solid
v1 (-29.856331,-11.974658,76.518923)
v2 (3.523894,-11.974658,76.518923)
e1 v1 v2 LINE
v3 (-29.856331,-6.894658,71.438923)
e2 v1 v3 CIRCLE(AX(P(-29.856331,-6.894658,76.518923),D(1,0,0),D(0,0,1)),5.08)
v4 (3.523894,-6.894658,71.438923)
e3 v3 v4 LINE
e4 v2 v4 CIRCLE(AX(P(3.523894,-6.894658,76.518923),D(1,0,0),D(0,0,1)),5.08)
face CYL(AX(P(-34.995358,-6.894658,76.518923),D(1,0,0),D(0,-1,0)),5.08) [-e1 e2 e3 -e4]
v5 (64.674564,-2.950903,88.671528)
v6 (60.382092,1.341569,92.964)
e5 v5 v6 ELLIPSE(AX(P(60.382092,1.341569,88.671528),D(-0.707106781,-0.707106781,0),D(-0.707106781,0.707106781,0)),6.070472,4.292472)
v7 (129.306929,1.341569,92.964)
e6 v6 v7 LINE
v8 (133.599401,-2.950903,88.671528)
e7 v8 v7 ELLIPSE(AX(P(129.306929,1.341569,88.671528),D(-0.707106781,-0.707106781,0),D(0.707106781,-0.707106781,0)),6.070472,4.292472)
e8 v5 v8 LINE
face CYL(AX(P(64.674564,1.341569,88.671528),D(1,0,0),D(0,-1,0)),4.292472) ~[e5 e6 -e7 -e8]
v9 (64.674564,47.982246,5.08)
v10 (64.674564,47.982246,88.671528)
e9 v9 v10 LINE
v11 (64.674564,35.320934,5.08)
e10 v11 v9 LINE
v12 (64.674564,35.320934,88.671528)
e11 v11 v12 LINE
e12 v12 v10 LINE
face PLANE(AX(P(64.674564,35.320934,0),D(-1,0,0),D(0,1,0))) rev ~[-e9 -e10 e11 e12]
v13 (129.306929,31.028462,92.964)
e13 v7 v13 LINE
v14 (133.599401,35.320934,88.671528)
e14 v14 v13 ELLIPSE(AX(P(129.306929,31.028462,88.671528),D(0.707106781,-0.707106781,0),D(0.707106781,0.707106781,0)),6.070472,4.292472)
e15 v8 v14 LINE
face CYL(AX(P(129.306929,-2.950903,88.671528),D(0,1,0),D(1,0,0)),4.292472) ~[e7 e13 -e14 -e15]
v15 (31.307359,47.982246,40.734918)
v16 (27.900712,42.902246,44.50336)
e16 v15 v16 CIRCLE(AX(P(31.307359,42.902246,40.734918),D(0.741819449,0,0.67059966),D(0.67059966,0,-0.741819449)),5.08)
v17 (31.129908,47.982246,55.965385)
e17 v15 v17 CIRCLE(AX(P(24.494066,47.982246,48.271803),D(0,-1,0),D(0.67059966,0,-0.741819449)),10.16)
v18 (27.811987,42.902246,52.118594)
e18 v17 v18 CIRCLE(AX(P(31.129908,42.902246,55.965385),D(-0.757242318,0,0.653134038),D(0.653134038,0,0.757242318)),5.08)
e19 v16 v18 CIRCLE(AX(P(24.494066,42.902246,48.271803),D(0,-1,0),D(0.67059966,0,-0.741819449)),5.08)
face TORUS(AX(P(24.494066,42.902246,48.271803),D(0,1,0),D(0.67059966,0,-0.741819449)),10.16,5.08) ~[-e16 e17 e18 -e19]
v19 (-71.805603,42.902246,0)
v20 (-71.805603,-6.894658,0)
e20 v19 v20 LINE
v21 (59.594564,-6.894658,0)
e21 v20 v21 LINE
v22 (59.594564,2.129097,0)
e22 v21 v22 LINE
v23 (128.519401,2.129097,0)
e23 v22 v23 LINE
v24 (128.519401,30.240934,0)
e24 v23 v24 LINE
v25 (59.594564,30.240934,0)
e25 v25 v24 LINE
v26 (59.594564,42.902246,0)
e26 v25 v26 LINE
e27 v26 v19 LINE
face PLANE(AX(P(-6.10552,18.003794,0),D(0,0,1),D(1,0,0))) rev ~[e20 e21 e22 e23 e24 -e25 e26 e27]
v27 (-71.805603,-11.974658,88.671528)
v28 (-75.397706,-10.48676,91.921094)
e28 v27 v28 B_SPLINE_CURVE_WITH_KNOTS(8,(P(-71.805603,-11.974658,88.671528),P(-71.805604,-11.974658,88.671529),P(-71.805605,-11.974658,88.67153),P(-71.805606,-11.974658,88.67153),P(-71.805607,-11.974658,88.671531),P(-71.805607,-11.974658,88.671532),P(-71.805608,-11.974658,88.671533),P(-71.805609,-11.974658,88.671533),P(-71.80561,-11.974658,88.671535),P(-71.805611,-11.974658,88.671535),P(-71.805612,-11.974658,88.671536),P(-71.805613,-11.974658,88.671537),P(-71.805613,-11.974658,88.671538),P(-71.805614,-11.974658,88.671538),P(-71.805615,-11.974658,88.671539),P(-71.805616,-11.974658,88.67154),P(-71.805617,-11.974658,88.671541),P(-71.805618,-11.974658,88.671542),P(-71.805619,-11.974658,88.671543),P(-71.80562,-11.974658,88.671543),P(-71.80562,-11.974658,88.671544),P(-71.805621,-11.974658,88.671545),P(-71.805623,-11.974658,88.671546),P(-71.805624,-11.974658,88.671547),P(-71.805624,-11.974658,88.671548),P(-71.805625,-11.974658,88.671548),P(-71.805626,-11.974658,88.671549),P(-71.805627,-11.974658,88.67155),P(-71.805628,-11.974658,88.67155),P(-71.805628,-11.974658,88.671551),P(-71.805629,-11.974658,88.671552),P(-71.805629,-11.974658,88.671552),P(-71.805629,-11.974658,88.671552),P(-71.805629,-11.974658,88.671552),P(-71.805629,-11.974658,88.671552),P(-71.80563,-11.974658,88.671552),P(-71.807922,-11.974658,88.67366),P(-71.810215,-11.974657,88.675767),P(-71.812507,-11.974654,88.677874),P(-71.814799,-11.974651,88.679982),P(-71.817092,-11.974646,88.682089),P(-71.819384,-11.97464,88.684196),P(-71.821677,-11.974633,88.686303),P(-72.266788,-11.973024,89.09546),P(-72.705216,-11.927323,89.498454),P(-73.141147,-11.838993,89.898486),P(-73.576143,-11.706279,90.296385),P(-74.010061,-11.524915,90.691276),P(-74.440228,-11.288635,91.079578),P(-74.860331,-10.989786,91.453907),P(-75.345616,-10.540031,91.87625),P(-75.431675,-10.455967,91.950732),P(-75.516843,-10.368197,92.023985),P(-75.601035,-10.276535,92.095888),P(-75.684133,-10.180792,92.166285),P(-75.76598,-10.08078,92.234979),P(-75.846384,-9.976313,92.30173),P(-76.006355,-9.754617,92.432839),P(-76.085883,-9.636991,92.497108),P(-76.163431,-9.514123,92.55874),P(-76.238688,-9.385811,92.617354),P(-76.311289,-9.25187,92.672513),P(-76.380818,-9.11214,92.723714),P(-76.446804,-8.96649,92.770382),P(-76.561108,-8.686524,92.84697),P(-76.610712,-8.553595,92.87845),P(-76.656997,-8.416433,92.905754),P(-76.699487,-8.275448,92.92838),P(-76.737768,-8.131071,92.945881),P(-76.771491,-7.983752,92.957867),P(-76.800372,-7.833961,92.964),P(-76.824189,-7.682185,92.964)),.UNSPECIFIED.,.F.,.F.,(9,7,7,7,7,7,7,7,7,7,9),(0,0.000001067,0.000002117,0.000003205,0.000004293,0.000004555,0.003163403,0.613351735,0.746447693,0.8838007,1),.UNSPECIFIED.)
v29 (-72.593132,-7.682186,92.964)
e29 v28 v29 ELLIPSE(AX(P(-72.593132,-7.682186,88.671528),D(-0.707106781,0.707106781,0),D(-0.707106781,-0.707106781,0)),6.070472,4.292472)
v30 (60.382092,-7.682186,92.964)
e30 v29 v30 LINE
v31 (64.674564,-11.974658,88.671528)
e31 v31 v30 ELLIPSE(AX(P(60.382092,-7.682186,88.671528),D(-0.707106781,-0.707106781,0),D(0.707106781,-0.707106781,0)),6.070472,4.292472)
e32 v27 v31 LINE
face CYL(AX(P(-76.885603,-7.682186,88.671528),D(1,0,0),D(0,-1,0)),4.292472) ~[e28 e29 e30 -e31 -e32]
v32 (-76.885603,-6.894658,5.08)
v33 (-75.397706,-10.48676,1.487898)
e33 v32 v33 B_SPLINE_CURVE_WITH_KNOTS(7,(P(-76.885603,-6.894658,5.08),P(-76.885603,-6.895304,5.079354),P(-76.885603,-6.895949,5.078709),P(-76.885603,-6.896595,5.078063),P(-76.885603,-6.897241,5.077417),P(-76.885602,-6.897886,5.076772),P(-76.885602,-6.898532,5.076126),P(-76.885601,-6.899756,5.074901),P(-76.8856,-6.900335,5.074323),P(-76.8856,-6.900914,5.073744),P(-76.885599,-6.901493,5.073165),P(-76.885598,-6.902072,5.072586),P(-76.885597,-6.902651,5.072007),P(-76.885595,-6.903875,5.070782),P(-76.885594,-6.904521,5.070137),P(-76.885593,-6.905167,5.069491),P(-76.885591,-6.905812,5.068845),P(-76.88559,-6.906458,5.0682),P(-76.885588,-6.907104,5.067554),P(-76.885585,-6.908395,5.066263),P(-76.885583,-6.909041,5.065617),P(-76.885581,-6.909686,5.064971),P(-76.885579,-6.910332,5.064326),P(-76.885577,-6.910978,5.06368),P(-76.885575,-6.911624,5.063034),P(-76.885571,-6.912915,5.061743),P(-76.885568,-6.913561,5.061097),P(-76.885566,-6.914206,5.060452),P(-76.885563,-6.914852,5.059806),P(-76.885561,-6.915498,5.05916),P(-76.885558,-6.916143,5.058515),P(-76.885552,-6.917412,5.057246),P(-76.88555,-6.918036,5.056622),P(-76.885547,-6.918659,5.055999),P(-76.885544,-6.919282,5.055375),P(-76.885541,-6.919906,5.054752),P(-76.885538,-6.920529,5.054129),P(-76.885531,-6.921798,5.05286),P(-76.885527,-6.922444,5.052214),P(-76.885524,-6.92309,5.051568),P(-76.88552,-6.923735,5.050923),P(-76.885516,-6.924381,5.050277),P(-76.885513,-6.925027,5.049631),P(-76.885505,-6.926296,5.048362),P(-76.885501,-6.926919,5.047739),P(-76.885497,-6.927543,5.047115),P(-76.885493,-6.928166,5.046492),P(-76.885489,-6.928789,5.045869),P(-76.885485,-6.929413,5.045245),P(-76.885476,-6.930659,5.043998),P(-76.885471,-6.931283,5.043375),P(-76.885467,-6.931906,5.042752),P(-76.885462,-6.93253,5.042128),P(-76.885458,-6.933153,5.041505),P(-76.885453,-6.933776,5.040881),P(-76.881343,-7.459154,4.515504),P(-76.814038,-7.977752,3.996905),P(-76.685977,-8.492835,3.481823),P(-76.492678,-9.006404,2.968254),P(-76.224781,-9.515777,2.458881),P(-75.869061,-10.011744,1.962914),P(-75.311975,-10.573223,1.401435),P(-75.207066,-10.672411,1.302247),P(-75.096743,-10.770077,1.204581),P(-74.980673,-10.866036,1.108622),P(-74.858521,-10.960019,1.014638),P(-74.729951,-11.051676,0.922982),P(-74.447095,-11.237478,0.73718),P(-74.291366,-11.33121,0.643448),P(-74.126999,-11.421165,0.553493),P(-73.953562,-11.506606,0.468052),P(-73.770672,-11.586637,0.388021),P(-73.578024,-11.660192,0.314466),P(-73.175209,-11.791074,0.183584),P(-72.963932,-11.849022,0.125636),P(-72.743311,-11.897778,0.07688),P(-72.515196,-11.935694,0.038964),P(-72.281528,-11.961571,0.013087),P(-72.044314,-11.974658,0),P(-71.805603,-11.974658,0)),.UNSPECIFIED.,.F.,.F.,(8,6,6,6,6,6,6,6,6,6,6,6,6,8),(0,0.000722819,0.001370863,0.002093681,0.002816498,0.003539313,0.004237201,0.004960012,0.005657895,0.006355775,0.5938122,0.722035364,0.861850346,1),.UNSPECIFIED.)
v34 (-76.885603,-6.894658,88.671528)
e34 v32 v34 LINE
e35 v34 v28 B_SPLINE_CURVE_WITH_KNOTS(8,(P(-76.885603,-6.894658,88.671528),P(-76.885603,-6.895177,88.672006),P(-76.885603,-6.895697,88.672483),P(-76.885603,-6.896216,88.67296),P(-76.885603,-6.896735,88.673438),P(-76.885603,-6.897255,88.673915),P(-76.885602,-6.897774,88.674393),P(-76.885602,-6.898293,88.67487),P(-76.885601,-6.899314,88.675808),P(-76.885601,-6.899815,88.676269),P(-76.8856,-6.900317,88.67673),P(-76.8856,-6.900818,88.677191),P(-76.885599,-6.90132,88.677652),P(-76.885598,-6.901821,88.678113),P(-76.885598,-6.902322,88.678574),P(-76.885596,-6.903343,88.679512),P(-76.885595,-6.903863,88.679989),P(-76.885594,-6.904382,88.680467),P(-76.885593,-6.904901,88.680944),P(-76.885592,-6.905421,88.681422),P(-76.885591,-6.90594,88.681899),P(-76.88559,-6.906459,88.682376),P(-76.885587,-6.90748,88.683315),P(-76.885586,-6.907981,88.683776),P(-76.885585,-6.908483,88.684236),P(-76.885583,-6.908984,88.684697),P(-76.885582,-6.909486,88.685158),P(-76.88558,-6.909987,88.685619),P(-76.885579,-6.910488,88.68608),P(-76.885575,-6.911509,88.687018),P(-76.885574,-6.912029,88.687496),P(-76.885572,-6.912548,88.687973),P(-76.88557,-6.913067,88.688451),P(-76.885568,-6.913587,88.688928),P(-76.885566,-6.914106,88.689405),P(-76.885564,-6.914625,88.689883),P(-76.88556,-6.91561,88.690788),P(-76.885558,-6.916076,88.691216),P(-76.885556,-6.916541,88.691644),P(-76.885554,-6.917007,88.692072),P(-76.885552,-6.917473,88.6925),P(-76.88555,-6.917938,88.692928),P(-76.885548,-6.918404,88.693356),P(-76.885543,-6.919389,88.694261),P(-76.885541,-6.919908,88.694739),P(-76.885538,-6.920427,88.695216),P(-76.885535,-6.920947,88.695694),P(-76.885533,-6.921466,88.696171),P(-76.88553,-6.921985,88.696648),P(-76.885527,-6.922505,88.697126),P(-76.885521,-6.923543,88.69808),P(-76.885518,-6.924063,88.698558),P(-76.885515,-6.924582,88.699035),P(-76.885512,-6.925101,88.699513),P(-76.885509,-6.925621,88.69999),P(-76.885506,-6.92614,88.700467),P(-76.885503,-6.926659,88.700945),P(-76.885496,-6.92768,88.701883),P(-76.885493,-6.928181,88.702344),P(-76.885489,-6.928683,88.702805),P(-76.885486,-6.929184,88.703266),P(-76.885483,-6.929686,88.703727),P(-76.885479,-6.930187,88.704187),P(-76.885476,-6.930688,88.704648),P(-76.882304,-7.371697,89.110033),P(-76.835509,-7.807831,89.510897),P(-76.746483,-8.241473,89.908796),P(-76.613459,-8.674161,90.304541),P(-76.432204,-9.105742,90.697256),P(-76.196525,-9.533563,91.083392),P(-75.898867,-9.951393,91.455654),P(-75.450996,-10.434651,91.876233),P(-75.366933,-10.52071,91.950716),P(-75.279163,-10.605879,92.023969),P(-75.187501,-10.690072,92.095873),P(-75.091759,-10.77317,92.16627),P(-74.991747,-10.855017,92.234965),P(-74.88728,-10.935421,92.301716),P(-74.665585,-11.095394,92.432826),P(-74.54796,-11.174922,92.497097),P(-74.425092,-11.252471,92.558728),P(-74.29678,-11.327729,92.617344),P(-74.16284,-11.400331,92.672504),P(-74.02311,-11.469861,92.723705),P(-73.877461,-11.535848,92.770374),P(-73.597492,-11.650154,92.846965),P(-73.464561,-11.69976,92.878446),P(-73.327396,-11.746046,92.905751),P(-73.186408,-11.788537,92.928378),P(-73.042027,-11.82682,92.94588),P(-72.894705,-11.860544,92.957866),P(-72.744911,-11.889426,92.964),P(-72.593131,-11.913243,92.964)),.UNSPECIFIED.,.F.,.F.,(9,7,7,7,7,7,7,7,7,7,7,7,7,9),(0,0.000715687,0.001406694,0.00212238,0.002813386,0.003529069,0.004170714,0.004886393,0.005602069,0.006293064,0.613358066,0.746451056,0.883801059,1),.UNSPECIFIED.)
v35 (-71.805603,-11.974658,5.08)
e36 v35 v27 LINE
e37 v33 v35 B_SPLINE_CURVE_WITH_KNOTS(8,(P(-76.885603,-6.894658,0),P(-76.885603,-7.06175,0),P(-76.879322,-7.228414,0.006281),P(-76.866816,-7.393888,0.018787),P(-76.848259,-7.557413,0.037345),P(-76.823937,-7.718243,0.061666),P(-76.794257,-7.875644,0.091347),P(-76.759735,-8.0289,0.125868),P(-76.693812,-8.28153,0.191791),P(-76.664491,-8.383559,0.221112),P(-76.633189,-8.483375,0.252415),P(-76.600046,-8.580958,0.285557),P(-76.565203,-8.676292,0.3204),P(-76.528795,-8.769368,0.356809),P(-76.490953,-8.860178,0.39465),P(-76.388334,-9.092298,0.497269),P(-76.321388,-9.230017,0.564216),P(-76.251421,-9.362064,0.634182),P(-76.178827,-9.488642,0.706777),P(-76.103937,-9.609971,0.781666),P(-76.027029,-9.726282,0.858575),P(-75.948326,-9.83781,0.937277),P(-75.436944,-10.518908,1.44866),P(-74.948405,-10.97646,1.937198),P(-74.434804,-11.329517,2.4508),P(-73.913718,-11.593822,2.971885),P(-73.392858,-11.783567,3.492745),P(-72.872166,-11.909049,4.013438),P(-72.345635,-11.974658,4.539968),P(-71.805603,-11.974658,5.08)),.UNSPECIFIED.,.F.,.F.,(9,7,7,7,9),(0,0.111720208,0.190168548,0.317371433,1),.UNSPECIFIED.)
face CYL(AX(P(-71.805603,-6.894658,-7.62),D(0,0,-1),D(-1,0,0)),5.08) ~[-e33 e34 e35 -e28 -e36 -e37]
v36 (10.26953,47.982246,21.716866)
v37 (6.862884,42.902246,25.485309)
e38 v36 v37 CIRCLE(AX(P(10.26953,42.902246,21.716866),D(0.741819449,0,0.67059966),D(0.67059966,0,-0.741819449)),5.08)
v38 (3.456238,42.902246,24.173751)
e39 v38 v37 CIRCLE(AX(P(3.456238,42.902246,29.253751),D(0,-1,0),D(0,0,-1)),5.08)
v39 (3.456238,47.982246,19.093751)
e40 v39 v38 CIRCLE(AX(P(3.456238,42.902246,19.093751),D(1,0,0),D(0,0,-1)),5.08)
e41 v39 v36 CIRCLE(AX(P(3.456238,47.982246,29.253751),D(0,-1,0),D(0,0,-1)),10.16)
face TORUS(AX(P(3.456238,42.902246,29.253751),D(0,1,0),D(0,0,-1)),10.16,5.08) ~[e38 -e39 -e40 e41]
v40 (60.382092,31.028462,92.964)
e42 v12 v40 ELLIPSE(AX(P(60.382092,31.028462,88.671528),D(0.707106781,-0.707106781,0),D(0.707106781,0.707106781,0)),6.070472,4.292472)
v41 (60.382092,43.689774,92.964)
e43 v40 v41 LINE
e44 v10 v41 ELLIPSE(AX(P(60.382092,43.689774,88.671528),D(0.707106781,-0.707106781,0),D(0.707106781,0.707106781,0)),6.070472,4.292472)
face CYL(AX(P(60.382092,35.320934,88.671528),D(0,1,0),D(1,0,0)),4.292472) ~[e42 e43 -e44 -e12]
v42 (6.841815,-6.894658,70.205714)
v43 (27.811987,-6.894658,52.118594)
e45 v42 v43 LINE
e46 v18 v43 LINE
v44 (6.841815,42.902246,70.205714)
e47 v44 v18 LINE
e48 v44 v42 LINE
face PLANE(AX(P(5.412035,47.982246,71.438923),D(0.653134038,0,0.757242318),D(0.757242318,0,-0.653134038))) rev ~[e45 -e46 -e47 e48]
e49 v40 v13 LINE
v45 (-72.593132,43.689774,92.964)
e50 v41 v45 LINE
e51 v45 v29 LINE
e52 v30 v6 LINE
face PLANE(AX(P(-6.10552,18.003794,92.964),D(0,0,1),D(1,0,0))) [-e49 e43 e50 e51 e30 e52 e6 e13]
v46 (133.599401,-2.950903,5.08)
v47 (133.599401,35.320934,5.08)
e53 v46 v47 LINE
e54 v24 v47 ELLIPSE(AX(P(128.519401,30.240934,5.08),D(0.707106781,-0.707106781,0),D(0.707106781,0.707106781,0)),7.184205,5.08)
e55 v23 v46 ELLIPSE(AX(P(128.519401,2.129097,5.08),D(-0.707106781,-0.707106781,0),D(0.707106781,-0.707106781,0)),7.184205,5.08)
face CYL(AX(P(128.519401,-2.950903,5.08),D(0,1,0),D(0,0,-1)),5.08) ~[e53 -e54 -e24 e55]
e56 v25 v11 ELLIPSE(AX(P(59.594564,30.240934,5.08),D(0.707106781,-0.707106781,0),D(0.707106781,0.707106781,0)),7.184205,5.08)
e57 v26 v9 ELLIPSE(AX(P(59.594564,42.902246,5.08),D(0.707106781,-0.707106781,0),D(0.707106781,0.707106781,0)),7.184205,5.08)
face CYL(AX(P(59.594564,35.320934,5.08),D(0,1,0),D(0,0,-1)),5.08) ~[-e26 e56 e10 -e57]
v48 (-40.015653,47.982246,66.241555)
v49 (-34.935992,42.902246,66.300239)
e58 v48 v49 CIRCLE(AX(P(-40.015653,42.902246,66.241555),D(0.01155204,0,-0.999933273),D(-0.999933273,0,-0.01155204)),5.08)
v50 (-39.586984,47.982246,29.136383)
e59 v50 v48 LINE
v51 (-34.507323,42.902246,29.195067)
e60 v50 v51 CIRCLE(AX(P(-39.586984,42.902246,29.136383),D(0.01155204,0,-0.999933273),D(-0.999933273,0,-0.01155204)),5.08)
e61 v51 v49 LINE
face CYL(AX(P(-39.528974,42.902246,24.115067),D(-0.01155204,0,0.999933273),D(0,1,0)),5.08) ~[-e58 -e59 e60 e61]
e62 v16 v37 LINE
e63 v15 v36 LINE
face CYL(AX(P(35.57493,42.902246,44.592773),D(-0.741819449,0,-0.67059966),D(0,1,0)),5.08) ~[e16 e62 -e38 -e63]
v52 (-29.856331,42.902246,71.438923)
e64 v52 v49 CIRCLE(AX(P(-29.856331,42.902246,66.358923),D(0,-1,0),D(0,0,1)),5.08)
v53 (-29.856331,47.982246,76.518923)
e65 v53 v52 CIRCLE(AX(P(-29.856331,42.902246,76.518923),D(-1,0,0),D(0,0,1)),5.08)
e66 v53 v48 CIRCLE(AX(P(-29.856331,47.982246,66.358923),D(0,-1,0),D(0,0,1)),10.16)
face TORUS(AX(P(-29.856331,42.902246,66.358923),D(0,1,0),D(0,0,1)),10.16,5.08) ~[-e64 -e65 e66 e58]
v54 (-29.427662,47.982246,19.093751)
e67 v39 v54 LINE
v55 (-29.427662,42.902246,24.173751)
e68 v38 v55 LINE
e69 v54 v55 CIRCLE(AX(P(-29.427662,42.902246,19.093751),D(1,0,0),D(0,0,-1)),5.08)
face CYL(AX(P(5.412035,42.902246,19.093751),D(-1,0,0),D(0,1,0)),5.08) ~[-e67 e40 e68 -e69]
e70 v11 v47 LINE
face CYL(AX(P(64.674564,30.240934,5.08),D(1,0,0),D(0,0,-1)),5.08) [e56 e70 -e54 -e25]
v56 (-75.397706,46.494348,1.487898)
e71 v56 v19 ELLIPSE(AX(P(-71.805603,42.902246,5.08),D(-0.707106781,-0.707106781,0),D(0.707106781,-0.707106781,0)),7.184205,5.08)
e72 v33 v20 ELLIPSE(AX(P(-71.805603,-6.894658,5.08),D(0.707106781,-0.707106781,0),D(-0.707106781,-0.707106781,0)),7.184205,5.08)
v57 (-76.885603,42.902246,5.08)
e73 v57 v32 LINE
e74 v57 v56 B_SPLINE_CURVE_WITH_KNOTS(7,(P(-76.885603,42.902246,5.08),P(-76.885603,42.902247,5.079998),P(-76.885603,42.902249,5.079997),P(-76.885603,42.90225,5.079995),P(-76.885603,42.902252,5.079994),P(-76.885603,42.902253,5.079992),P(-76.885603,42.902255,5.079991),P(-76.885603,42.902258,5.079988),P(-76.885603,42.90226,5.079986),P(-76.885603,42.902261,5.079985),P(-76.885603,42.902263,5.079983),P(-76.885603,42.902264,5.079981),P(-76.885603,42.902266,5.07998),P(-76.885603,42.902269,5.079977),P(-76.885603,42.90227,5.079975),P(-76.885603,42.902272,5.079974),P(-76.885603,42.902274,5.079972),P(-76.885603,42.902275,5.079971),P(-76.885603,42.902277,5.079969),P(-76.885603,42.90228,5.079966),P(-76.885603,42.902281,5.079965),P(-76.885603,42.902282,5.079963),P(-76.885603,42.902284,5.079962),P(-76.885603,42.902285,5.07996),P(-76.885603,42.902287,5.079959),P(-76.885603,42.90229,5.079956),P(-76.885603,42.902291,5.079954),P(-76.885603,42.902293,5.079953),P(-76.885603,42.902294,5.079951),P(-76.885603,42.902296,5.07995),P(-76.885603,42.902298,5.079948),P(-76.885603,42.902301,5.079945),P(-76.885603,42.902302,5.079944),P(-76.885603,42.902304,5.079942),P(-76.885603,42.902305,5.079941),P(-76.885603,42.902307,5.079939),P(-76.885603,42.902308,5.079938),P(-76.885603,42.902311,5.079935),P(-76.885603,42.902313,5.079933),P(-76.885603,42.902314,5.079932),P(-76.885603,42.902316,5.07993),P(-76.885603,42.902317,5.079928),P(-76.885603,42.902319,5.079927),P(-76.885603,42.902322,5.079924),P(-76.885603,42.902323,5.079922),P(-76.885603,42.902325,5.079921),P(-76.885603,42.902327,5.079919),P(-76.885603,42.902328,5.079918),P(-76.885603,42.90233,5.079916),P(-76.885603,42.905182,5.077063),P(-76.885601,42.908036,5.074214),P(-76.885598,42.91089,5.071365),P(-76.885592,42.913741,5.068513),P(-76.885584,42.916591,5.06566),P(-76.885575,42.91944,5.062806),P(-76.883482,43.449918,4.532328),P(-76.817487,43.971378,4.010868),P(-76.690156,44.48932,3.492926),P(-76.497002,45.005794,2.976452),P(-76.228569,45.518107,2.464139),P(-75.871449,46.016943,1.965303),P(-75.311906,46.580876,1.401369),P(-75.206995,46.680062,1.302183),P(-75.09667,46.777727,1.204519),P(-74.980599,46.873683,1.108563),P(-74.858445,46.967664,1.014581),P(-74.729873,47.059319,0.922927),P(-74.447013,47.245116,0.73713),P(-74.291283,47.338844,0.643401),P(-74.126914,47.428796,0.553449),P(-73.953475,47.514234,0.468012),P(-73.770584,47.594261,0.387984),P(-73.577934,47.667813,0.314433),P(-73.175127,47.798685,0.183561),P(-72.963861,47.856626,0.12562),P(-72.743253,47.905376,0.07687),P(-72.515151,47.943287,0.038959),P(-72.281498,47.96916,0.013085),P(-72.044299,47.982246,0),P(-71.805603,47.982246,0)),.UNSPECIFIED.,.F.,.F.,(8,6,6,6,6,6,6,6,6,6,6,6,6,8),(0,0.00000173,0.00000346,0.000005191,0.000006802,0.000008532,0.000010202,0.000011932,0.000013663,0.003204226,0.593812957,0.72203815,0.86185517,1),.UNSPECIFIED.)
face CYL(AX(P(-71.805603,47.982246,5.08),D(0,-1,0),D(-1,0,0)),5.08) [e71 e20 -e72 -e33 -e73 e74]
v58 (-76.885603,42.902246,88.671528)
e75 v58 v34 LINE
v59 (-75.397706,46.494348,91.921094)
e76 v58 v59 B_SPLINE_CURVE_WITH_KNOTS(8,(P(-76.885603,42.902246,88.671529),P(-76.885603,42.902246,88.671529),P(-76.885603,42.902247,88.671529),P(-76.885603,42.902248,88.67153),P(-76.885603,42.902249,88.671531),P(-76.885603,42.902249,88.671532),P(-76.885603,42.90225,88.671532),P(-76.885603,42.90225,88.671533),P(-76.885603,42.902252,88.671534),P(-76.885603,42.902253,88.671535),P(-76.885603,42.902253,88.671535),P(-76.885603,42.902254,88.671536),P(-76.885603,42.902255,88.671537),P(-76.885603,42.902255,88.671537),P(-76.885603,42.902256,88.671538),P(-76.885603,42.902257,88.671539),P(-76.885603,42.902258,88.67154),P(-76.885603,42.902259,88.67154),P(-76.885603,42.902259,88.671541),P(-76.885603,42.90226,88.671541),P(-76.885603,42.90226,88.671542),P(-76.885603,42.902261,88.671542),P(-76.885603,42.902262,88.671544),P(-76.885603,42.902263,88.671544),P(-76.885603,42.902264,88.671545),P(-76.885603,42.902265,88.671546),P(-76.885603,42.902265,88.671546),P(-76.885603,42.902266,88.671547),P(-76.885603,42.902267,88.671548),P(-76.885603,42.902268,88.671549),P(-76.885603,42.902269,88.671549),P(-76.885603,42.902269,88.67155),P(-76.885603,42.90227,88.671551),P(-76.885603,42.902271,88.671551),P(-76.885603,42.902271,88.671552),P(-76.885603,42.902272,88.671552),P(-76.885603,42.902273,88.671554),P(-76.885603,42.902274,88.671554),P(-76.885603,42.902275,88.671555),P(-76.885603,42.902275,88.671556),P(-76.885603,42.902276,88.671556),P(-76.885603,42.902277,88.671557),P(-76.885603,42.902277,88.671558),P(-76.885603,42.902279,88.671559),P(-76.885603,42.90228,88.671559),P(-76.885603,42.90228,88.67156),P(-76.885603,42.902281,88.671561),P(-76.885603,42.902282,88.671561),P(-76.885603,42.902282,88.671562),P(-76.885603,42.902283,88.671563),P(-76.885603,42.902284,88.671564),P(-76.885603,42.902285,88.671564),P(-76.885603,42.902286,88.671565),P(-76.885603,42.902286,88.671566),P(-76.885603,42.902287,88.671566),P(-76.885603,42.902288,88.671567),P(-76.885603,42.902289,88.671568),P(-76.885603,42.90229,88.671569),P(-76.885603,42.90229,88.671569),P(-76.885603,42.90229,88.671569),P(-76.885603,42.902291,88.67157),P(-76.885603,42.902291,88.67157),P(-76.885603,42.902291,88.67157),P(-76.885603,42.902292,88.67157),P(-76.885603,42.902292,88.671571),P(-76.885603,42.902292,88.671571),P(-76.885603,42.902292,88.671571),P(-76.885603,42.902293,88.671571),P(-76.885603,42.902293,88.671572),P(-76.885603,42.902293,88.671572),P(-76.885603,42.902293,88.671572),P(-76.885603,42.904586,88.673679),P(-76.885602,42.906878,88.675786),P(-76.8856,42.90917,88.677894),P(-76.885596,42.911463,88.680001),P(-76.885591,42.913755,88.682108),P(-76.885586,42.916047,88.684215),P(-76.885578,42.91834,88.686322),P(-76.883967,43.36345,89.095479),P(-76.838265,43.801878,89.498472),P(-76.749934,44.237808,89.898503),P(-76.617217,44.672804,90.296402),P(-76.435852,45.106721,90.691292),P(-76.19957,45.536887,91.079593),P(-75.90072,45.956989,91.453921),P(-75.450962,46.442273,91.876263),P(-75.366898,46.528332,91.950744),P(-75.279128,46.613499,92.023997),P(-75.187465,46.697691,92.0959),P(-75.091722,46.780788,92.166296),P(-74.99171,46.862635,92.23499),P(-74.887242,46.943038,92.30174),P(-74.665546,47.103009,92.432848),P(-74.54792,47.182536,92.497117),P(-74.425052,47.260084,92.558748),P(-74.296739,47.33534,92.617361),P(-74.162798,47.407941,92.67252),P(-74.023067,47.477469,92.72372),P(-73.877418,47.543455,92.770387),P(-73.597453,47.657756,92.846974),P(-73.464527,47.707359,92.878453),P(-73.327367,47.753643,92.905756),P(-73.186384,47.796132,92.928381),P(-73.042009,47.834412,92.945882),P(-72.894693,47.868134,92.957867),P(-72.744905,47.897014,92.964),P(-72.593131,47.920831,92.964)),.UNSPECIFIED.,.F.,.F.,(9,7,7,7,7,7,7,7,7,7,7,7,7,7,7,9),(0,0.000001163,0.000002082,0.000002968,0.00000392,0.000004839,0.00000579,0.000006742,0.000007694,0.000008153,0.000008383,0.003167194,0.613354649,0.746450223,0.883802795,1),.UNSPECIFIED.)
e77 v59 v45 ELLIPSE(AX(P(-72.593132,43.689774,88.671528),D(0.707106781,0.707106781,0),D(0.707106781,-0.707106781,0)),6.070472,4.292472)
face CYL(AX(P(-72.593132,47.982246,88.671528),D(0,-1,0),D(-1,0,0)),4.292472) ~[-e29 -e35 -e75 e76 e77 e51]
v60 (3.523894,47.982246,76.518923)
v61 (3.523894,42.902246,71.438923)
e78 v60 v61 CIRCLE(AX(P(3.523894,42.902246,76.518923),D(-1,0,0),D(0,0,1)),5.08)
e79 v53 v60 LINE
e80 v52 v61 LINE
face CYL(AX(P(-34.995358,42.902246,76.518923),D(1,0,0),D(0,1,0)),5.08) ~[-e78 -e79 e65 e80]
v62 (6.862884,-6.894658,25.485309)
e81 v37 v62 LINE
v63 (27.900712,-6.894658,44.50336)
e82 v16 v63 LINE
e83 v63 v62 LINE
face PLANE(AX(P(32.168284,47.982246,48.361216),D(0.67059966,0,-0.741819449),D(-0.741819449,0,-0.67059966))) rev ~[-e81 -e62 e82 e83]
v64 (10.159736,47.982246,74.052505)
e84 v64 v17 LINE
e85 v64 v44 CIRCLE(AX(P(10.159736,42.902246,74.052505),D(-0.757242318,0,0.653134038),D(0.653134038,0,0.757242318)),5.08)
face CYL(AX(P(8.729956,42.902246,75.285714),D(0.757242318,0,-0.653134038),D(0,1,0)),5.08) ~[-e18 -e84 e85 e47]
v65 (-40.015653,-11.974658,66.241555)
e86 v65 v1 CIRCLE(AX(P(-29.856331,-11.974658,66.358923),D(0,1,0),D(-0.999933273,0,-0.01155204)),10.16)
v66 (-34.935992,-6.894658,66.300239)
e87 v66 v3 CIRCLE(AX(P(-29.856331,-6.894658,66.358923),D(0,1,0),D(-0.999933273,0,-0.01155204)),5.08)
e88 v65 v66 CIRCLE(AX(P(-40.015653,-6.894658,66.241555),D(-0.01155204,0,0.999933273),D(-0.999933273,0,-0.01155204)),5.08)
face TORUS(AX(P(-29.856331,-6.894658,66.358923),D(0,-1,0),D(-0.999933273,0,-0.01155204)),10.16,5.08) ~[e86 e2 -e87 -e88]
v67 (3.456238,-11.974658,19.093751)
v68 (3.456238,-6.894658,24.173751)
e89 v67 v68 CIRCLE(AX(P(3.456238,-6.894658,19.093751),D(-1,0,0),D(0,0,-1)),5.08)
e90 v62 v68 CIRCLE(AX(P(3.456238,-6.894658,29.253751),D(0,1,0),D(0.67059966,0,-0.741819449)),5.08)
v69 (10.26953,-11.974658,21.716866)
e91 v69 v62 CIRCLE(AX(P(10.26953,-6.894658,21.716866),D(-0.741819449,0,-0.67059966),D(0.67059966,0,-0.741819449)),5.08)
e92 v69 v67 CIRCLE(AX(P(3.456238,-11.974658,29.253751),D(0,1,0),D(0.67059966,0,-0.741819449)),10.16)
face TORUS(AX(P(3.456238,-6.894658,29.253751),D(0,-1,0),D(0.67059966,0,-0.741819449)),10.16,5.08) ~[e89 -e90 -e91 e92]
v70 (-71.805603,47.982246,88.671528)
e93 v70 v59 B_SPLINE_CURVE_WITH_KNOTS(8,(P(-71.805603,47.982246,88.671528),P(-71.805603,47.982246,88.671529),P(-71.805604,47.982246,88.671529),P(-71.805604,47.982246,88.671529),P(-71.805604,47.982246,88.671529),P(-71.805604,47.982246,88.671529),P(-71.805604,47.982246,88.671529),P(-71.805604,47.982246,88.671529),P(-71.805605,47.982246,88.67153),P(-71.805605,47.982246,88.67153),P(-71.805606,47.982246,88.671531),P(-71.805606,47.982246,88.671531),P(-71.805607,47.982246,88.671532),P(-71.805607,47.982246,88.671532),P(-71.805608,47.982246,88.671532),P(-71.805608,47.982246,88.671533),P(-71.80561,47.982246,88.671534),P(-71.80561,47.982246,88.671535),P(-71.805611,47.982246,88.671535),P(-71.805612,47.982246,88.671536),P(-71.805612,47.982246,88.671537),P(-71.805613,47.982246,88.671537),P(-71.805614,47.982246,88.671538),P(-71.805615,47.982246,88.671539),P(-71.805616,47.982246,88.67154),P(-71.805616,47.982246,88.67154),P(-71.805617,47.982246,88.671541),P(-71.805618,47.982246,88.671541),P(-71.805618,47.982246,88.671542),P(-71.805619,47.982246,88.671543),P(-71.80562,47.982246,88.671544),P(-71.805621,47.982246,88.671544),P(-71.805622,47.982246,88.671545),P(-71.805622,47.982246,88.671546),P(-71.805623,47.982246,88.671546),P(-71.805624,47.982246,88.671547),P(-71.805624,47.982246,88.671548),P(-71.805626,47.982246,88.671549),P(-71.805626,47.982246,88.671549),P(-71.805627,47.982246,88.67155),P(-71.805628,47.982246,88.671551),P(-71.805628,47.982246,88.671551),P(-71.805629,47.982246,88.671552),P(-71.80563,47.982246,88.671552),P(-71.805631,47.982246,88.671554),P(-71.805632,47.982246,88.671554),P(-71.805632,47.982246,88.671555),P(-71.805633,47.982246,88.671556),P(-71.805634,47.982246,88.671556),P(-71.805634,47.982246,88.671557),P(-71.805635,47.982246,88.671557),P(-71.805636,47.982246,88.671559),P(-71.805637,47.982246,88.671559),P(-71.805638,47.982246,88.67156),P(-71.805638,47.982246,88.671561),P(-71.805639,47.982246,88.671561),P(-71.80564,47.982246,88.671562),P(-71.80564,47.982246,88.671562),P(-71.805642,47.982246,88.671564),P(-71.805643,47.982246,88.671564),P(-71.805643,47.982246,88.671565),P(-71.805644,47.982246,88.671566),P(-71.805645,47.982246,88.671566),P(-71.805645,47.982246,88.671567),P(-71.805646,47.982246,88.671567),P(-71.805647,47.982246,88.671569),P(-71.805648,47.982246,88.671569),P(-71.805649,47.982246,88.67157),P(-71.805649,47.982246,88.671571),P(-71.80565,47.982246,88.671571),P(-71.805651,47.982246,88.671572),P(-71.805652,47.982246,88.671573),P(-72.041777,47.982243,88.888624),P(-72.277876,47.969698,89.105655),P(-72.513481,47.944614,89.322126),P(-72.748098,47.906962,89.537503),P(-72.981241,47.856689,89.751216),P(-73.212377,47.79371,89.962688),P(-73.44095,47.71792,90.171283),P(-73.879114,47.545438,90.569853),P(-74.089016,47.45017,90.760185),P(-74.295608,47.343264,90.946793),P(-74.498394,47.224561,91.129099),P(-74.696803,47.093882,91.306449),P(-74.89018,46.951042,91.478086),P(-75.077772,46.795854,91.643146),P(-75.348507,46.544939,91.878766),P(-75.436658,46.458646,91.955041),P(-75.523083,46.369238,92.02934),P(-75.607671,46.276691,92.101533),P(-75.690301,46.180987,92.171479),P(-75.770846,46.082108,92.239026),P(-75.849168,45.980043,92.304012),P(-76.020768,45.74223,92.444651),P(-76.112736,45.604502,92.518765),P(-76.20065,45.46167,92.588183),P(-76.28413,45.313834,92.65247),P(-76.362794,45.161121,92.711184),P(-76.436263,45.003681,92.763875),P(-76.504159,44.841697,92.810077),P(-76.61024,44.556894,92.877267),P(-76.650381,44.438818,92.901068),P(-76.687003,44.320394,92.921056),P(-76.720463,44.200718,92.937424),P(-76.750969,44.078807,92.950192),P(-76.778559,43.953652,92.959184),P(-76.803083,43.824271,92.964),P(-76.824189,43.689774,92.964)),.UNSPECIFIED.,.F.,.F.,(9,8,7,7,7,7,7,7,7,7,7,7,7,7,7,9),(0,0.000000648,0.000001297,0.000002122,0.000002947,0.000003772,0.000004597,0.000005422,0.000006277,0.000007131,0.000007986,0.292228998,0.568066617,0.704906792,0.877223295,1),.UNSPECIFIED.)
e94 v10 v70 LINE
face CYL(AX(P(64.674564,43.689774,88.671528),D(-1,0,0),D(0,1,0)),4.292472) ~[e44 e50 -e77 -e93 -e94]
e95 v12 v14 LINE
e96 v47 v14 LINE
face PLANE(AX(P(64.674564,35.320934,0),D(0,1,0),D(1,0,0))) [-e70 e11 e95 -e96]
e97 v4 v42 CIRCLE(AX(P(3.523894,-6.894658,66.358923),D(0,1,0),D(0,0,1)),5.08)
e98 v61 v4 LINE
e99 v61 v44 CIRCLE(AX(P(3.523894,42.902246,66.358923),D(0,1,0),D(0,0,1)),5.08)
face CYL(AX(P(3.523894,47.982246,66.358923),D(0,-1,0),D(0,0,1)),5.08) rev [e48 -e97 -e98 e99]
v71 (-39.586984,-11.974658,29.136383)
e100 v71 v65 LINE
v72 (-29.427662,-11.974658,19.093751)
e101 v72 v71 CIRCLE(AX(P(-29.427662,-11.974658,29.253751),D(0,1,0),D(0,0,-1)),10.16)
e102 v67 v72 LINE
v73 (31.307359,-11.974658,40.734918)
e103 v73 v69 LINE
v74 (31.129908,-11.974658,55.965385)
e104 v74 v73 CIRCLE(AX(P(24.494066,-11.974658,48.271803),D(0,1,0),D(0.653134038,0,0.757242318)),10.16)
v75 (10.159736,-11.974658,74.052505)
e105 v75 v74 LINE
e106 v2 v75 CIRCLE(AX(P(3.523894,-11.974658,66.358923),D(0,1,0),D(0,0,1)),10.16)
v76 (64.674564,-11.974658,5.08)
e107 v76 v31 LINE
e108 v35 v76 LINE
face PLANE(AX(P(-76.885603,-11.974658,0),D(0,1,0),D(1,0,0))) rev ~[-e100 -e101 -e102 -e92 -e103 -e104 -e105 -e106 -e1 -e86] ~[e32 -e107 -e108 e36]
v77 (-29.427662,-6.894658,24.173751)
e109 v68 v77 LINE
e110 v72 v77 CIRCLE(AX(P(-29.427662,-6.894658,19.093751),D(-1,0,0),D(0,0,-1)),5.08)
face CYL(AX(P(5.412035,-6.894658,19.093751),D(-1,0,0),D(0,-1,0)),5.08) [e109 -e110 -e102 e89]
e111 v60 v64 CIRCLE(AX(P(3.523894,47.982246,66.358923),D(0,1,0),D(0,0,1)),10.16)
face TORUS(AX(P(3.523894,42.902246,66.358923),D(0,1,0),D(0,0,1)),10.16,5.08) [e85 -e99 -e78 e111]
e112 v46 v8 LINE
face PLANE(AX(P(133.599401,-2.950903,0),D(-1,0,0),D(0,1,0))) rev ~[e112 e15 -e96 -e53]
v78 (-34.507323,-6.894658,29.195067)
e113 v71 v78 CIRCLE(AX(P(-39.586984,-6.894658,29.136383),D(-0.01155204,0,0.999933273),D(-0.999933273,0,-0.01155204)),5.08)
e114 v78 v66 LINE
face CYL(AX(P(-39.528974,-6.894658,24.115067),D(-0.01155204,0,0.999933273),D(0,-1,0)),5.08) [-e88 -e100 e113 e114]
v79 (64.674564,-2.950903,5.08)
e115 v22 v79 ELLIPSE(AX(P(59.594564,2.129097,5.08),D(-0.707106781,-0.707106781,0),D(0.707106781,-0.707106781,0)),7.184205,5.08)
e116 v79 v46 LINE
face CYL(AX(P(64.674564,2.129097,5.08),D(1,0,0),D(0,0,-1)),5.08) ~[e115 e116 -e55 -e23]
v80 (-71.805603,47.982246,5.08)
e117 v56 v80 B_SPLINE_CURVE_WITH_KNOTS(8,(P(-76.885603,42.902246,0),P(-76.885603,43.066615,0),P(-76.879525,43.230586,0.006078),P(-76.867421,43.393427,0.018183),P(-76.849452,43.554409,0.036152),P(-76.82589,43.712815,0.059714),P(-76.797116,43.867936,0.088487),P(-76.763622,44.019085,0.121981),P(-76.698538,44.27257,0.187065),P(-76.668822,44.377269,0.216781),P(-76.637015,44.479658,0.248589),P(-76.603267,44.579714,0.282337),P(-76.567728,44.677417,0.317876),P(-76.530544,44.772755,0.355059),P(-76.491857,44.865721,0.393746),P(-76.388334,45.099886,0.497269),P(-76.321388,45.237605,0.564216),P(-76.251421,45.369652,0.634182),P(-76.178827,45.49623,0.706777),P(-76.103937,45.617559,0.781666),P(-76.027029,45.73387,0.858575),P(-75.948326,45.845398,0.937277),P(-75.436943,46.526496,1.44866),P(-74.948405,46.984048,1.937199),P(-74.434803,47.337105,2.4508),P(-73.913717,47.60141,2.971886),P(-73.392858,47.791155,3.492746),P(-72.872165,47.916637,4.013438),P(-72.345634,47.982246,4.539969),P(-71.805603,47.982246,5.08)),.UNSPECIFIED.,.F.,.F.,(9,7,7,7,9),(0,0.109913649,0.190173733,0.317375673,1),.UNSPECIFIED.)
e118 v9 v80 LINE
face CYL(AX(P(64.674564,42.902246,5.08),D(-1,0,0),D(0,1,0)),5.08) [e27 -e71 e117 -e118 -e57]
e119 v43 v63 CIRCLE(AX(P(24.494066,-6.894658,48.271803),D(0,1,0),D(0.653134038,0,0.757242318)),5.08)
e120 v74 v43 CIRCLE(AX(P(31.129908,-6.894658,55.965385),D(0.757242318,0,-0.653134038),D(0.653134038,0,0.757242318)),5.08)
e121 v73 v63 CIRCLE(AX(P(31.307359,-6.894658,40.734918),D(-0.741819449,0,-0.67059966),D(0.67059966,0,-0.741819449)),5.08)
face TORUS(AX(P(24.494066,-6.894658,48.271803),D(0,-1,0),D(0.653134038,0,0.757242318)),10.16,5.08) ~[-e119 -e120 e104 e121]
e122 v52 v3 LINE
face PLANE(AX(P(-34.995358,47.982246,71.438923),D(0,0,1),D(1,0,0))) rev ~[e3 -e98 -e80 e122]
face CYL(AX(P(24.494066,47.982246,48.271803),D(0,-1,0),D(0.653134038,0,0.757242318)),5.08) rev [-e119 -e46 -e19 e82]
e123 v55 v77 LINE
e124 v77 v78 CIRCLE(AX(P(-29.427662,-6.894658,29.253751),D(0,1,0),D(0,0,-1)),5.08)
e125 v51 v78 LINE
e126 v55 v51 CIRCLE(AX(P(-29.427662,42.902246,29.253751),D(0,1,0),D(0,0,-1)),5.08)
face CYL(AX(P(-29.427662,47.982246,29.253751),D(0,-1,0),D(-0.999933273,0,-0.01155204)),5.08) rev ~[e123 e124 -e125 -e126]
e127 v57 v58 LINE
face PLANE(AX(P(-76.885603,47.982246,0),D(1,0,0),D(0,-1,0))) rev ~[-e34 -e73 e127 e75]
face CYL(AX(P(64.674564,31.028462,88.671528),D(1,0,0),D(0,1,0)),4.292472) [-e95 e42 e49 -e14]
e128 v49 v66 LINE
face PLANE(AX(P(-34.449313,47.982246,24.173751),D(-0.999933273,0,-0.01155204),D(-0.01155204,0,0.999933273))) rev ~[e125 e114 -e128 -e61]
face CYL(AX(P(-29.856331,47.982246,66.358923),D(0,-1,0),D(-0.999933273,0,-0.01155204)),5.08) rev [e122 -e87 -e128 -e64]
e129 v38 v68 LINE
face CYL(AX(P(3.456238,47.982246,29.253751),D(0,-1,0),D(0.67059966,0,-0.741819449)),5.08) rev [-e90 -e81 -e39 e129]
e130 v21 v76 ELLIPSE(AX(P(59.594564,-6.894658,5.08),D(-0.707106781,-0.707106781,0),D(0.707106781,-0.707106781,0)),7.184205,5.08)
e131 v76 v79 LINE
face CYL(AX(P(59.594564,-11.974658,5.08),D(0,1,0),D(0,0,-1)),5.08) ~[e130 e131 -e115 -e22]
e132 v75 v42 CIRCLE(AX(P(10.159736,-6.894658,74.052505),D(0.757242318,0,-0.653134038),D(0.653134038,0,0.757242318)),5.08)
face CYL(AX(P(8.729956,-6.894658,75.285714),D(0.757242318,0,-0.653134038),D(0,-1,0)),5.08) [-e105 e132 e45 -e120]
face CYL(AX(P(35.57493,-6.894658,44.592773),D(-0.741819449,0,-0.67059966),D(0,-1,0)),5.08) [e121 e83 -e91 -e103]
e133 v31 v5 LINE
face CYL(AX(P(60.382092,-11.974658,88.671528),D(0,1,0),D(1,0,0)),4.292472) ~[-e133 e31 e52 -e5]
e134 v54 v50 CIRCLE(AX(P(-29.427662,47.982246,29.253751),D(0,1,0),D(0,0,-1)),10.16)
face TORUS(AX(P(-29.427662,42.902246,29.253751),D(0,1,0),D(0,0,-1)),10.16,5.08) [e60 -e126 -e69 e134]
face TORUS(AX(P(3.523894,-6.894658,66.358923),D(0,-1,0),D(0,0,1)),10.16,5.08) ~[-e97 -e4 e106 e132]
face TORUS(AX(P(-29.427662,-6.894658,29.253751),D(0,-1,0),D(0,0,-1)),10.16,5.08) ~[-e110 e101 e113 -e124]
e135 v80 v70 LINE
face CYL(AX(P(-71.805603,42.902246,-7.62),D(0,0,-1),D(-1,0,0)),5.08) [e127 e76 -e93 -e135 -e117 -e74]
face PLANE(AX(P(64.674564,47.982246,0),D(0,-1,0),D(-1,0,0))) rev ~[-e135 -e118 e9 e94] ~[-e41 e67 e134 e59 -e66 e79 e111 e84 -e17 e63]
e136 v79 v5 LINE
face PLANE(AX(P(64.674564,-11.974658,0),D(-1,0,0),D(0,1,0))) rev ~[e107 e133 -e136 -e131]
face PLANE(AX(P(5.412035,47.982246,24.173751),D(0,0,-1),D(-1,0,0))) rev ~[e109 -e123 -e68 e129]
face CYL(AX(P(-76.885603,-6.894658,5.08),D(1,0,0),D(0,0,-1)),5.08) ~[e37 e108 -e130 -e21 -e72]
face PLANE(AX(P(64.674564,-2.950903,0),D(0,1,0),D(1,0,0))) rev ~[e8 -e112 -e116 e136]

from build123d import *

# Parameters (mm, degrees)
F0_W        = 68.9248368144
F0_H        = 38.2718367036
F1_DEPTH    = 92.964
F2_R        = 4.2924717139
F3_R        = 5.08
F4_T1_DEPTH = 108.9915282861
F6_DEPTH    = 66.294
F7_R        = 5.08


# Not quite as in the source:
# - a fillet or chamfer that OpenCascade refuses, or shapes differently, is made with other operations: its cross-section is extruded or revolved along the edge and cut away or added


with BuildPart() as f1:
    # F0 (on Top) → F1 (new body)
    with BuildSketch(Plane.XY):
        Polygon((-76.8856033683, 47.9822456837), (-76.8856033683, -11.9746578857), (64.6745637059, -11.9746578857), (64.6745637059, -2.9509027954), (64.6745637059, 35.3209339082), (64.6745637059, 47.9822456837), align=None)
        with Locations((99.1369821131, 16.1850155564)):
            Rectangle(F0_W, F0_H)
    extrude(amount=F1_DEPTH)

    # F2
    f2_edges = [f1.edges().sort_by_distance(p)[0] for p in [
        (-76.885603, 18.003794, 92.964),
        (-6.10552, -11.974658, 92.964),
        (64.674564, -7.46278, 92.964),
        (99.136982, -2.950903, 92.964),
        (133.599401, 16.185016, 92.964),
        (99.136982, 35.320934, 92.964),
        (64.674564, 41.65159, 92.964),
        (-6.10552, 47.982246, 92.964),
    ]]
    fillet(f2_edges, radius=F2_R)

    # F3
    f3_edges = [f1.edges().sort_by_distance(p)[0] for p in [
        (99.136982, -2.950903, 0),
        (-76.885603, 18.003794, 0),
        (-6.10552, -11.974658, 0),
        (64.674564, -7.46278, 0),
        (133.599401, 16.185016, 0),
        (99.136982, 35.320934, 0),
        (64.674564, 41.65159, 0),
        (-6.10552, 47.982246, 0),
    ]]
    fillet(f3_edges, radius=F3_R)

    # F4: fillet of radius 5.08 on 4 edges, made by hand

    # F4_s2 → F4_t1 (cut)
    with BuildSketch(Plane.XY.offset(-7.62)):
        with BuildLine():
            ThreePointArc((-76.8856033683, 42.9022456837), (-75.3977058167, 46.4943481321), (-71.8056033683, 47.9822456837))
            Line((-71.8056033683, 47.9822456837), (-76.8856033683, 47.9822456837))
            Line((-76.8856033683, 47.9822456837), (-76.8856033683, 42.9022456837))
        make_face()
        with BuildLine():
            ThreePointArc((-76.8856033683, -6.8946578857), (-75.3977058167, -10.4867603342), (-71.8056033683, -11.9746578857))
            Line((-71.8056033683, -11.9746578857), (-76.8856033683, -11.9746578857))
            Line((-76.8856033683, -11.9746578857), (-76.8856033683, -6.8946578857))
        make_face()
    extrude(amount=F4_T1_DEPTH, mode=Mode.SUBTRACT)

    # F5 (on face) → F6 (cut)
    with BuildSketch(Plane(origin=(0, 47.9822456837, 0), x_dir=(-1, 0, 0), z_dir=(0, 1, 0))):
        Polygon((34.4493128359, 24.1737514734), (34.9953584373, 71.4389234781), (-5.412035156, 71.4389234781), (-32.1682840586, 48.3612157404), (-5.412035156, 24.1737514734), align=None)
    extrude(amount=-F6_DEPTH, mode=Mode.SUBTRACT)

    # F7
    f7_edges = [f1.edges().sort_by_distance(p)[0] for p in [
        (-34.722336, 47.982246, 47.806337),
        (-34.995358, 18.003794, 71.438923),
        (-34.722336, -11.974658, 47.806337),
        (-34.449313, 18.003794, 24.173751),
        (18.79016, 47.982246, 59.90007),
        (32.168284, 18.003794, 48.361216),
        (18.79016, -11.974658, 59.90007),
        (5.412035, 18.003794, 71.438923),
        (18.79016, 47.982246, 36.267484),
        (5.412035, 18.003794, 24.173751),
        (18.79016, -11.974658, 36.267484),
        (-14.791662, -11.974658, 71.438923),
        (-14.518639, -11.974658, 24.173751),
        (-14.518639, 47.982246, 24.173751),
        (-14.791662, 47.982246, 71.438923),
    ]]
    fillet(f7_edges, radius=F7_R)


solid = f1.part
